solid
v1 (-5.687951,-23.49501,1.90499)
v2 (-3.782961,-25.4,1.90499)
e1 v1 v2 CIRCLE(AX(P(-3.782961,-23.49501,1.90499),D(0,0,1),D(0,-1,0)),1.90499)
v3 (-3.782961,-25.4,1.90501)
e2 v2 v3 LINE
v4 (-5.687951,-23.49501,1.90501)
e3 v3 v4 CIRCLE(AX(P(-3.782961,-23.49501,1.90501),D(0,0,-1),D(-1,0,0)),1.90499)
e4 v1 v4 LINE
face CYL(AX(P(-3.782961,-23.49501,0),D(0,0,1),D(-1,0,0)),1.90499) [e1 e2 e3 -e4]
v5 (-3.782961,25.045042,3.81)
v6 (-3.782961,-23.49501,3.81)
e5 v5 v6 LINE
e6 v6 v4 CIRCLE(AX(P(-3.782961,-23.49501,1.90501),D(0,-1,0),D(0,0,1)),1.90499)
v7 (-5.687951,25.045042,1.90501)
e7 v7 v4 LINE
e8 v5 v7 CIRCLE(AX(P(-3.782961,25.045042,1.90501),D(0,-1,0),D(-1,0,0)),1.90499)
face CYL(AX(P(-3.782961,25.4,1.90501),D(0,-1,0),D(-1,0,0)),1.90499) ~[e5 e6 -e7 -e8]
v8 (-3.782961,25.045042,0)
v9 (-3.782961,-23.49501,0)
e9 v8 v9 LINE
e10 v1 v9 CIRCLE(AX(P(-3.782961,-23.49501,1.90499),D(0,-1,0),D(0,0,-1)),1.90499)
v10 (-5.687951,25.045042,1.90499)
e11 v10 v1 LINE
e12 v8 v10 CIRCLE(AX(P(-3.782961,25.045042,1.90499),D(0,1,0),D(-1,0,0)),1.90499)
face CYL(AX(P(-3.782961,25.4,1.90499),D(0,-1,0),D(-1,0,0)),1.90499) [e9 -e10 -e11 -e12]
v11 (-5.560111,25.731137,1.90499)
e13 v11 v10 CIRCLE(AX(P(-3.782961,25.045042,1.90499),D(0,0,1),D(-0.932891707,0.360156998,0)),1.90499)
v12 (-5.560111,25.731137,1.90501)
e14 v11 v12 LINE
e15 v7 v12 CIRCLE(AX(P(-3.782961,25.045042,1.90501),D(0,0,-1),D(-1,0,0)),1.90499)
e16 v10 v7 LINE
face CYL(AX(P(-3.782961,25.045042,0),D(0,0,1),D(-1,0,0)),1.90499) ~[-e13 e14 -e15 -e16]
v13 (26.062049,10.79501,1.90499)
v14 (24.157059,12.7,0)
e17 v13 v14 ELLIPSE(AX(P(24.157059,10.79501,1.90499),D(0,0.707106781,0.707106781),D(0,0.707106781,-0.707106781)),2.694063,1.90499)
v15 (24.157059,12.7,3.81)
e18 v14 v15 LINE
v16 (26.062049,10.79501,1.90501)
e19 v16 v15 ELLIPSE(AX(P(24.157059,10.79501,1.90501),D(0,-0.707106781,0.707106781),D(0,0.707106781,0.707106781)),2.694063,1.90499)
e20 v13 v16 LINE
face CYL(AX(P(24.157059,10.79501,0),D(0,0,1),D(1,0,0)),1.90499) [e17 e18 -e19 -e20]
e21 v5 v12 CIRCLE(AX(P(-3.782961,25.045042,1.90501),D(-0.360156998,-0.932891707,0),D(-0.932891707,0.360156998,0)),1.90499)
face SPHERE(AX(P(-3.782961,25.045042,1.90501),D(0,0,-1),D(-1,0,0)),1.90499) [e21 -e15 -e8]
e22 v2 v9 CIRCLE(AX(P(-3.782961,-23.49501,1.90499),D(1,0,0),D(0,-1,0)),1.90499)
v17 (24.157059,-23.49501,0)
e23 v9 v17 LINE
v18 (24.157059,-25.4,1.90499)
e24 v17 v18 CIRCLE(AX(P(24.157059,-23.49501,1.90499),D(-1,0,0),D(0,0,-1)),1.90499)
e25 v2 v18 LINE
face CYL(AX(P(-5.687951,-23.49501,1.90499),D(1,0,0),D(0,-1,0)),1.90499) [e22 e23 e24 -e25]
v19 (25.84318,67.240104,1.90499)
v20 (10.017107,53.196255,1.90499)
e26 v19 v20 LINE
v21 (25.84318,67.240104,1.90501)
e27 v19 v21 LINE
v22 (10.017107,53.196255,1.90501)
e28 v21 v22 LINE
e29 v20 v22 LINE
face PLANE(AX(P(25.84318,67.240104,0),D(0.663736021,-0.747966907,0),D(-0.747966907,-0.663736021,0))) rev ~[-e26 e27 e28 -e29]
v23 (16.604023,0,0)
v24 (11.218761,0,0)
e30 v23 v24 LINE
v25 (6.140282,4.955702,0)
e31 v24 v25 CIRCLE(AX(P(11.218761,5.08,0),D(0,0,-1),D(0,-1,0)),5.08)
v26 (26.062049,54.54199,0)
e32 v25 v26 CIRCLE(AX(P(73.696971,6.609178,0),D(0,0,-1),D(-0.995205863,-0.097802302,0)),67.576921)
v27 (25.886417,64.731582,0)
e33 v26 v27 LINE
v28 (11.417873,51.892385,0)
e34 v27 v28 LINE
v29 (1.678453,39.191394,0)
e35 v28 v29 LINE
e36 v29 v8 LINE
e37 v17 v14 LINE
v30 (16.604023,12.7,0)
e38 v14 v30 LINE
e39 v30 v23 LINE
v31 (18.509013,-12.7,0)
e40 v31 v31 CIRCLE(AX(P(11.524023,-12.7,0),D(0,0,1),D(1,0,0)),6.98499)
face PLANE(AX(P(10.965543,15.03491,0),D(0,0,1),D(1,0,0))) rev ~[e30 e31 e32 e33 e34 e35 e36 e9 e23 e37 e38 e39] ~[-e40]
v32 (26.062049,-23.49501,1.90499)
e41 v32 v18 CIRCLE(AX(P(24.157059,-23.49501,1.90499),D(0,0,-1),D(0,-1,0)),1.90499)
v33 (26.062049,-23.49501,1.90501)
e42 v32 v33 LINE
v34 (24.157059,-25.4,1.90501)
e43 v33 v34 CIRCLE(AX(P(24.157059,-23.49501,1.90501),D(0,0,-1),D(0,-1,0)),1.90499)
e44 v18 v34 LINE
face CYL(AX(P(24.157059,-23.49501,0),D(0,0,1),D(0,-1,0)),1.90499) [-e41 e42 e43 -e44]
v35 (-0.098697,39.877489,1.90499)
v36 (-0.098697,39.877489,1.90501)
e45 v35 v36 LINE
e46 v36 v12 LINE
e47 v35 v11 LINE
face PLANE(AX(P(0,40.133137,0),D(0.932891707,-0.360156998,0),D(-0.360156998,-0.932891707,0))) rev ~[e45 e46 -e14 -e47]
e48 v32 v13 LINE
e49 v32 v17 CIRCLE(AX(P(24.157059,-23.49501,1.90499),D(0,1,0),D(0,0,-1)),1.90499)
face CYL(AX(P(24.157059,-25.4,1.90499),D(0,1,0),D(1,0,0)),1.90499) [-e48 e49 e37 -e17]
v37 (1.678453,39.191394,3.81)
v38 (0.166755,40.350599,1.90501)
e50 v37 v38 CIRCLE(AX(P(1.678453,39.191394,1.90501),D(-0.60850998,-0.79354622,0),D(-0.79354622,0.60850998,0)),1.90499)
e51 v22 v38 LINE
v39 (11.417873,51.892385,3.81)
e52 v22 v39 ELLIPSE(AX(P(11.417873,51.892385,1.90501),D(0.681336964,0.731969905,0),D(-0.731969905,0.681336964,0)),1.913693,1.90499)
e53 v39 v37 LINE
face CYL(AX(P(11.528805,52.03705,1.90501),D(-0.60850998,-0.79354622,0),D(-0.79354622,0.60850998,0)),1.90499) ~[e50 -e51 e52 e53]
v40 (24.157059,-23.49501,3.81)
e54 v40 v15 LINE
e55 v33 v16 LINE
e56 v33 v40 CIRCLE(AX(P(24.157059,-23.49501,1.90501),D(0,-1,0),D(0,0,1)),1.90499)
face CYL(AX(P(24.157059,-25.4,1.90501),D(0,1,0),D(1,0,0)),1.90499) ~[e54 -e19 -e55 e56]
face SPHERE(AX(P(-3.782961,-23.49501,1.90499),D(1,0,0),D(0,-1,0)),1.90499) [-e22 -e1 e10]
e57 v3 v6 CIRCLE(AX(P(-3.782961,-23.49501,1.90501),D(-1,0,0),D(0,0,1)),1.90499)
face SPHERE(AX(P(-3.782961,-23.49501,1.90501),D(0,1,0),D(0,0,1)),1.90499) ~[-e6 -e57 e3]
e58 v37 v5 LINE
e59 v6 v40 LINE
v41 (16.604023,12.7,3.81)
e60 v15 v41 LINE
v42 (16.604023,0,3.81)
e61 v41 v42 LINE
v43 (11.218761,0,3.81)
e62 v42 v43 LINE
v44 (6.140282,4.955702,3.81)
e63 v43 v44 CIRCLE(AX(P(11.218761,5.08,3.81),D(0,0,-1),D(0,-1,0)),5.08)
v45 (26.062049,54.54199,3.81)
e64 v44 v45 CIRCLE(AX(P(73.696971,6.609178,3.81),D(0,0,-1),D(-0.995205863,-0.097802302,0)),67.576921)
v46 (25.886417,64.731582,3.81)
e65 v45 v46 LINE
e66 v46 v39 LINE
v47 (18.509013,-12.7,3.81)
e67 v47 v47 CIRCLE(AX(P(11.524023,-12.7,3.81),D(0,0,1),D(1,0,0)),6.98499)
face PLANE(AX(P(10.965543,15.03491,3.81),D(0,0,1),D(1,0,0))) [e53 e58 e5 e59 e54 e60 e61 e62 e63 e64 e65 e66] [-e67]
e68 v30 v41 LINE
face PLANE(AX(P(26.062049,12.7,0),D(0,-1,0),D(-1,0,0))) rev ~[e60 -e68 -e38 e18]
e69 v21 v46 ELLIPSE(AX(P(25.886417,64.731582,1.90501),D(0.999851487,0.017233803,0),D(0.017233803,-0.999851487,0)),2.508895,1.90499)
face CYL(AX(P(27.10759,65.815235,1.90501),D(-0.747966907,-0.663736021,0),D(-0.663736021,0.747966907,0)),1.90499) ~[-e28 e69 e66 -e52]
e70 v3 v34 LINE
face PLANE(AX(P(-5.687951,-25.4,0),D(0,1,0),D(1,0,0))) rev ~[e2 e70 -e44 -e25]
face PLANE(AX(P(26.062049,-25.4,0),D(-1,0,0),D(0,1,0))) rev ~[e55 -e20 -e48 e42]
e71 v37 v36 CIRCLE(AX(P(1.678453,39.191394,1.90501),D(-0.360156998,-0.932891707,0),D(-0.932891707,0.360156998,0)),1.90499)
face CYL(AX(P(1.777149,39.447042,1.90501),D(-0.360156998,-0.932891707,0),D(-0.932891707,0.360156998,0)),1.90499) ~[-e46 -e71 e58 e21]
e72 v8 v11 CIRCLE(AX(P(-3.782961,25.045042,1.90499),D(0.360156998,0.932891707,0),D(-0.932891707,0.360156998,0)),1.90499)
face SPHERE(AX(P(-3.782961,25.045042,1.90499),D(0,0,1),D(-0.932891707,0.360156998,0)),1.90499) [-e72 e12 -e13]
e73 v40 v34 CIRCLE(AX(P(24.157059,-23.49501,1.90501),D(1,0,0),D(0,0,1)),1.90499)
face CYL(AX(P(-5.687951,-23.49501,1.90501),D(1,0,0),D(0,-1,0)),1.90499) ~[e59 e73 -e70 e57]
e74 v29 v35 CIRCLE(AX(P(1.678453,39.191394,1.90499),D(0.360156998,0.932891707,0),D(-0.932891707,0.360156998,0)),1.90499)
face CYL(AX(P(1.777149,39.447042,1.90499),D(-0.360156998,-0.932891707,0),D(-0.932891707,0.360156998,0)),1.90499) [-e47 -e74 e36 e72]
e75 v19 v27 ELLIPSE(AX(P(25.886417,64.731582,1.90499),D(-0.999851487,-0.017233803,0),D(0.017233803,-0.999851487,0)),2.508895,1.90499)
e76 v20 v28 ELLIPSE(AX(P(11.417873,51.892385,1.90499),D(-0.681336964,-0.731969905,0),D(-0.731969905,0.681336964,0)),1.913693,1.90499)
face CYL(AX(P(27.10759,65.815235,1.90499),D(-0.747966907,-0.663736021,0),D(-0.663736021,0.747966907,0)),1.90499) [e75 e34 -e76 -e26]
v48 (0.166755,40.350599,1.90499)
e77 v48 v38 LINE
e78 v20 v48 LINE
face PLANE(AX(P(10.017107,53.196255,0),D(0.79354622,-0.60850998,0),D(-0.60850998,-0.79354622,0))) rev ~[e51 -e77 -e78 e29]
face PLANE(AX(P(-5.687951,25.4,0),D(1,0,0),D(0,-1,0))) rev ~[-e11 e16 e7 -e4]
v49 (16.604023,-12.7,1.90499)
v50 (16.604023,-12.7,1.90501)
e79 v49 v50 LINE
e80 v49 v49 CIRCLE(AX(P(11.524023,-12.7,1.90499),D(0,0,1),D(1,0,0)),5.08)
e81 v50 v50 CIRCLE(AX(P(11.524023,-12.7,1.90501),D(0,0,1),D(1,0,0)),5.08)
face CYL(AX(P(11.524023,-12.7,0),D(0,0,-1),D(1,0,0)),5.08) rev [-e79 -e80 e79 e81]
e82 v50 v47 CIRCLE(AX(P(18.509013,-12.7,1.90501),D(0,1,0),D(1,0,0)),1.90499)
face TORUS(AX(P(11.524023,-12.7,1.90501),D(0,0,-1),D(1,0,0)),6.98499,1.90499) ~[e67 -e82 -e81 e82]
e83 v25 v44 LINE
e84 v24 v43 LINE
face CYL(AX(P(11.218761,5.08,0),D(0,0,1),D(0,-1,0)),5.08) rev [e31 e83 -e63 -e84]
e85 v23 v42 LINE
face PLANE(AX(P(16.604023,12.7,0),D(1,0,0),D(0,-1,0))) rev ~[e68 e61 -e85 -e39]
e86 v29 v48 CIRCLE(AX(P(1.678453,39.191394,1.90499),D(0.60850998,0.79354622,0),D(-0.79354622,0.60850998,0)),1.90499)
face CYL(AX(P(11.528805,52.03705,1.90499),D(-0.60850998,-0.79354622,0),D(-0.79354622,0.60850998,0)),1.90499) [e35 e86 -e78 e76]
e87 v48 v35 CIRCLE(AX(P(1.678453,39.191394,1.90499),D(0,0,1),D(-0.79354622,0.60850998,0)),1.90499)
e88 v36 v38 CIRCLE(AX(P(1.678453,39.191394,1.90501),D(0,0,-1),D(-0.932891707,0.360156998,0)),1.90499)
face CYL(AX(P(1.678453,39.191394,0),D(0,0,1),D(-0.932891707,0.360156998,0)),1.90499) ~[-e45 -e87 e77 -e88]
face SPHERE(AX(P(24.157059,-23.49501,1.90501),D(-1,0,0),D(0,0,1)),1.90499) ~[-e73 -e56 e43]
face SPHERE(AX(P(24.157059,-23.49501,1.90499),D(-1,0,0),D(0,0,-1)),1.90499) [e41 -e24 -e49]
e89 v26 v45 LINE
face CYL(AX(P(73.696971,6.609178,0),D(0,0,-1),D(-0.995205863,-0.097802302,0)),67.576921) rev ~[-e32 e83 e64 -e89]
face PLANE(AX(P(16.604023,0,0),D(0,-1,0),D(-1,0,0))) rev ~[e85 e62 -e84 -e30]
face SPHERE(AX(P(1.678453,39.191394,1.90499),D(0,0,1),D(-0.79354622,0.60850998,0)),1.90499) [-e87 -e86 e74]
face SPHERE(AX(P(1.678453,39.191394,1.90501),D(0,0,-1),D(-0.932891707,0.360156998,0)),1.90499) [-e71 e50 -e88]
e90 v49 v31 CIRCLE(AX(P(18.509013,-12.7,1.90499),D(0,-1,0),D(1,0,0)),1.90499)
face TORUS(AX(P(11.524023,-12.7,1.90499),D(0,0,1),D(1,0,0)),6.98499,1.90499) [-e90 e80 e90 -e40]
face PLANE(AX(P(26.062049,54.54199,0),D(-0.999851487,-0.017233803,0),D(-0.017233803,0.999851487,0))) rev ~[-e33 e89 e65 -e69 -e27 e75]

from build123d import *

# Parameters (mm, degrees)
F0_R     = 5.08
F1_DEPTH = 3.81
F2_R     = 1.90499
F4_R     = 5.08


# Not quite as in the source:
# - two fillets or chamfers of one size are made in one step
# - a fillet or chamfer is up to 0.001 mm smaller than in the source, because OpenCascade refuses the exact size


with BuildPart() as f1:
    # F0 (on Top) → F1 (new body)
    with BuildSketch(Plane.XY):
        with BuildLine():
            Line((-5.6879511814, 25.4), (-5.6879511814, -25.4))
            Line((-5.6879511814, -25.4), (5.6879511814, -25.4))
            Line((5.6879511814, -25.4), (26.0620488186, -25.4))
            Line((26.0620488186, -25.4), (26.0620488186, 0))
            Line((26.0620488186, 0), (26.0620488186, 12.7))
            Line((26.0620488186, 12.7), (16.6040229345, 12.7))
            Line((16.6040229345, 12.7), (16.6040229345, 0))
            Line((16.6040229345, 0), (6.4440229345, 0))
            ThreePointArc((6.4440229345, 0), (10.1083489192, 29.4811569654), (26.0620488186, 54.5419901609))
            Line((26.0620488186, 54.5419901609), (25.8431795214, 67.2401040457))
            Line((25.8431795214, 67.2401040457), (10.0171072409, 53.1962551177))
            Line((10.0171072409, 53.1962551177), (0, 40.1331372559))
            Line((0, 40.1331372559), (-5.6879511814, 25.4))
        make_face()
        with Locations((11.5240229345, -12.7)):
            Circle(F0_R, mode=Mode.SUBTRACT)
    extrude(amount=F1_DEPTH)

    # F2 (radius 1.905 in the source; OpenCascade refuses exactly that, so slightly less here)
    f2_edges = [f1.edges().sort_by_distance(p)[0] for p in [
        (-5.687951, 0, 3.81),
        (10.187049, -25.4, 3.81),
        (10.187049, -25.4, 0),
        (26.062049, -6.35, 3.81),
        (26.062049, -6.35, 0),
        (26.062049, -25.4, 1.905),
        (-5.687951, -25.4, 1.905),
        (26.062049, 12.7, 1.905),
        (-2.843976, 32.766569, 3.81),
        (-2.843976, 32.766569, 0),
        (-5.687951, 0, 0),
        (6.444023, -12.7, 0),
        (6.444023, -12.7, 3.81),
        (17.930143, 60.21818, 0),
        (17.930143, 60.21818, 3.81),
        (5.008554, 46.664696, 3.81),
        (-5.687951, 25.4, 1.905),
        (0, 40.133137, 1.905),
        (5.008554, 46.664696, 0),
    ]]
    fillet(f2_edges, radius=F2_R)

    # F4
    f4_edges = [f1.edges().sort_by_distance(p)[0] for p in [
        (6.444023, 0, 1.905),
    ]]
    fillet(f4_edges, radius=F4_R)


solid = f1.part
